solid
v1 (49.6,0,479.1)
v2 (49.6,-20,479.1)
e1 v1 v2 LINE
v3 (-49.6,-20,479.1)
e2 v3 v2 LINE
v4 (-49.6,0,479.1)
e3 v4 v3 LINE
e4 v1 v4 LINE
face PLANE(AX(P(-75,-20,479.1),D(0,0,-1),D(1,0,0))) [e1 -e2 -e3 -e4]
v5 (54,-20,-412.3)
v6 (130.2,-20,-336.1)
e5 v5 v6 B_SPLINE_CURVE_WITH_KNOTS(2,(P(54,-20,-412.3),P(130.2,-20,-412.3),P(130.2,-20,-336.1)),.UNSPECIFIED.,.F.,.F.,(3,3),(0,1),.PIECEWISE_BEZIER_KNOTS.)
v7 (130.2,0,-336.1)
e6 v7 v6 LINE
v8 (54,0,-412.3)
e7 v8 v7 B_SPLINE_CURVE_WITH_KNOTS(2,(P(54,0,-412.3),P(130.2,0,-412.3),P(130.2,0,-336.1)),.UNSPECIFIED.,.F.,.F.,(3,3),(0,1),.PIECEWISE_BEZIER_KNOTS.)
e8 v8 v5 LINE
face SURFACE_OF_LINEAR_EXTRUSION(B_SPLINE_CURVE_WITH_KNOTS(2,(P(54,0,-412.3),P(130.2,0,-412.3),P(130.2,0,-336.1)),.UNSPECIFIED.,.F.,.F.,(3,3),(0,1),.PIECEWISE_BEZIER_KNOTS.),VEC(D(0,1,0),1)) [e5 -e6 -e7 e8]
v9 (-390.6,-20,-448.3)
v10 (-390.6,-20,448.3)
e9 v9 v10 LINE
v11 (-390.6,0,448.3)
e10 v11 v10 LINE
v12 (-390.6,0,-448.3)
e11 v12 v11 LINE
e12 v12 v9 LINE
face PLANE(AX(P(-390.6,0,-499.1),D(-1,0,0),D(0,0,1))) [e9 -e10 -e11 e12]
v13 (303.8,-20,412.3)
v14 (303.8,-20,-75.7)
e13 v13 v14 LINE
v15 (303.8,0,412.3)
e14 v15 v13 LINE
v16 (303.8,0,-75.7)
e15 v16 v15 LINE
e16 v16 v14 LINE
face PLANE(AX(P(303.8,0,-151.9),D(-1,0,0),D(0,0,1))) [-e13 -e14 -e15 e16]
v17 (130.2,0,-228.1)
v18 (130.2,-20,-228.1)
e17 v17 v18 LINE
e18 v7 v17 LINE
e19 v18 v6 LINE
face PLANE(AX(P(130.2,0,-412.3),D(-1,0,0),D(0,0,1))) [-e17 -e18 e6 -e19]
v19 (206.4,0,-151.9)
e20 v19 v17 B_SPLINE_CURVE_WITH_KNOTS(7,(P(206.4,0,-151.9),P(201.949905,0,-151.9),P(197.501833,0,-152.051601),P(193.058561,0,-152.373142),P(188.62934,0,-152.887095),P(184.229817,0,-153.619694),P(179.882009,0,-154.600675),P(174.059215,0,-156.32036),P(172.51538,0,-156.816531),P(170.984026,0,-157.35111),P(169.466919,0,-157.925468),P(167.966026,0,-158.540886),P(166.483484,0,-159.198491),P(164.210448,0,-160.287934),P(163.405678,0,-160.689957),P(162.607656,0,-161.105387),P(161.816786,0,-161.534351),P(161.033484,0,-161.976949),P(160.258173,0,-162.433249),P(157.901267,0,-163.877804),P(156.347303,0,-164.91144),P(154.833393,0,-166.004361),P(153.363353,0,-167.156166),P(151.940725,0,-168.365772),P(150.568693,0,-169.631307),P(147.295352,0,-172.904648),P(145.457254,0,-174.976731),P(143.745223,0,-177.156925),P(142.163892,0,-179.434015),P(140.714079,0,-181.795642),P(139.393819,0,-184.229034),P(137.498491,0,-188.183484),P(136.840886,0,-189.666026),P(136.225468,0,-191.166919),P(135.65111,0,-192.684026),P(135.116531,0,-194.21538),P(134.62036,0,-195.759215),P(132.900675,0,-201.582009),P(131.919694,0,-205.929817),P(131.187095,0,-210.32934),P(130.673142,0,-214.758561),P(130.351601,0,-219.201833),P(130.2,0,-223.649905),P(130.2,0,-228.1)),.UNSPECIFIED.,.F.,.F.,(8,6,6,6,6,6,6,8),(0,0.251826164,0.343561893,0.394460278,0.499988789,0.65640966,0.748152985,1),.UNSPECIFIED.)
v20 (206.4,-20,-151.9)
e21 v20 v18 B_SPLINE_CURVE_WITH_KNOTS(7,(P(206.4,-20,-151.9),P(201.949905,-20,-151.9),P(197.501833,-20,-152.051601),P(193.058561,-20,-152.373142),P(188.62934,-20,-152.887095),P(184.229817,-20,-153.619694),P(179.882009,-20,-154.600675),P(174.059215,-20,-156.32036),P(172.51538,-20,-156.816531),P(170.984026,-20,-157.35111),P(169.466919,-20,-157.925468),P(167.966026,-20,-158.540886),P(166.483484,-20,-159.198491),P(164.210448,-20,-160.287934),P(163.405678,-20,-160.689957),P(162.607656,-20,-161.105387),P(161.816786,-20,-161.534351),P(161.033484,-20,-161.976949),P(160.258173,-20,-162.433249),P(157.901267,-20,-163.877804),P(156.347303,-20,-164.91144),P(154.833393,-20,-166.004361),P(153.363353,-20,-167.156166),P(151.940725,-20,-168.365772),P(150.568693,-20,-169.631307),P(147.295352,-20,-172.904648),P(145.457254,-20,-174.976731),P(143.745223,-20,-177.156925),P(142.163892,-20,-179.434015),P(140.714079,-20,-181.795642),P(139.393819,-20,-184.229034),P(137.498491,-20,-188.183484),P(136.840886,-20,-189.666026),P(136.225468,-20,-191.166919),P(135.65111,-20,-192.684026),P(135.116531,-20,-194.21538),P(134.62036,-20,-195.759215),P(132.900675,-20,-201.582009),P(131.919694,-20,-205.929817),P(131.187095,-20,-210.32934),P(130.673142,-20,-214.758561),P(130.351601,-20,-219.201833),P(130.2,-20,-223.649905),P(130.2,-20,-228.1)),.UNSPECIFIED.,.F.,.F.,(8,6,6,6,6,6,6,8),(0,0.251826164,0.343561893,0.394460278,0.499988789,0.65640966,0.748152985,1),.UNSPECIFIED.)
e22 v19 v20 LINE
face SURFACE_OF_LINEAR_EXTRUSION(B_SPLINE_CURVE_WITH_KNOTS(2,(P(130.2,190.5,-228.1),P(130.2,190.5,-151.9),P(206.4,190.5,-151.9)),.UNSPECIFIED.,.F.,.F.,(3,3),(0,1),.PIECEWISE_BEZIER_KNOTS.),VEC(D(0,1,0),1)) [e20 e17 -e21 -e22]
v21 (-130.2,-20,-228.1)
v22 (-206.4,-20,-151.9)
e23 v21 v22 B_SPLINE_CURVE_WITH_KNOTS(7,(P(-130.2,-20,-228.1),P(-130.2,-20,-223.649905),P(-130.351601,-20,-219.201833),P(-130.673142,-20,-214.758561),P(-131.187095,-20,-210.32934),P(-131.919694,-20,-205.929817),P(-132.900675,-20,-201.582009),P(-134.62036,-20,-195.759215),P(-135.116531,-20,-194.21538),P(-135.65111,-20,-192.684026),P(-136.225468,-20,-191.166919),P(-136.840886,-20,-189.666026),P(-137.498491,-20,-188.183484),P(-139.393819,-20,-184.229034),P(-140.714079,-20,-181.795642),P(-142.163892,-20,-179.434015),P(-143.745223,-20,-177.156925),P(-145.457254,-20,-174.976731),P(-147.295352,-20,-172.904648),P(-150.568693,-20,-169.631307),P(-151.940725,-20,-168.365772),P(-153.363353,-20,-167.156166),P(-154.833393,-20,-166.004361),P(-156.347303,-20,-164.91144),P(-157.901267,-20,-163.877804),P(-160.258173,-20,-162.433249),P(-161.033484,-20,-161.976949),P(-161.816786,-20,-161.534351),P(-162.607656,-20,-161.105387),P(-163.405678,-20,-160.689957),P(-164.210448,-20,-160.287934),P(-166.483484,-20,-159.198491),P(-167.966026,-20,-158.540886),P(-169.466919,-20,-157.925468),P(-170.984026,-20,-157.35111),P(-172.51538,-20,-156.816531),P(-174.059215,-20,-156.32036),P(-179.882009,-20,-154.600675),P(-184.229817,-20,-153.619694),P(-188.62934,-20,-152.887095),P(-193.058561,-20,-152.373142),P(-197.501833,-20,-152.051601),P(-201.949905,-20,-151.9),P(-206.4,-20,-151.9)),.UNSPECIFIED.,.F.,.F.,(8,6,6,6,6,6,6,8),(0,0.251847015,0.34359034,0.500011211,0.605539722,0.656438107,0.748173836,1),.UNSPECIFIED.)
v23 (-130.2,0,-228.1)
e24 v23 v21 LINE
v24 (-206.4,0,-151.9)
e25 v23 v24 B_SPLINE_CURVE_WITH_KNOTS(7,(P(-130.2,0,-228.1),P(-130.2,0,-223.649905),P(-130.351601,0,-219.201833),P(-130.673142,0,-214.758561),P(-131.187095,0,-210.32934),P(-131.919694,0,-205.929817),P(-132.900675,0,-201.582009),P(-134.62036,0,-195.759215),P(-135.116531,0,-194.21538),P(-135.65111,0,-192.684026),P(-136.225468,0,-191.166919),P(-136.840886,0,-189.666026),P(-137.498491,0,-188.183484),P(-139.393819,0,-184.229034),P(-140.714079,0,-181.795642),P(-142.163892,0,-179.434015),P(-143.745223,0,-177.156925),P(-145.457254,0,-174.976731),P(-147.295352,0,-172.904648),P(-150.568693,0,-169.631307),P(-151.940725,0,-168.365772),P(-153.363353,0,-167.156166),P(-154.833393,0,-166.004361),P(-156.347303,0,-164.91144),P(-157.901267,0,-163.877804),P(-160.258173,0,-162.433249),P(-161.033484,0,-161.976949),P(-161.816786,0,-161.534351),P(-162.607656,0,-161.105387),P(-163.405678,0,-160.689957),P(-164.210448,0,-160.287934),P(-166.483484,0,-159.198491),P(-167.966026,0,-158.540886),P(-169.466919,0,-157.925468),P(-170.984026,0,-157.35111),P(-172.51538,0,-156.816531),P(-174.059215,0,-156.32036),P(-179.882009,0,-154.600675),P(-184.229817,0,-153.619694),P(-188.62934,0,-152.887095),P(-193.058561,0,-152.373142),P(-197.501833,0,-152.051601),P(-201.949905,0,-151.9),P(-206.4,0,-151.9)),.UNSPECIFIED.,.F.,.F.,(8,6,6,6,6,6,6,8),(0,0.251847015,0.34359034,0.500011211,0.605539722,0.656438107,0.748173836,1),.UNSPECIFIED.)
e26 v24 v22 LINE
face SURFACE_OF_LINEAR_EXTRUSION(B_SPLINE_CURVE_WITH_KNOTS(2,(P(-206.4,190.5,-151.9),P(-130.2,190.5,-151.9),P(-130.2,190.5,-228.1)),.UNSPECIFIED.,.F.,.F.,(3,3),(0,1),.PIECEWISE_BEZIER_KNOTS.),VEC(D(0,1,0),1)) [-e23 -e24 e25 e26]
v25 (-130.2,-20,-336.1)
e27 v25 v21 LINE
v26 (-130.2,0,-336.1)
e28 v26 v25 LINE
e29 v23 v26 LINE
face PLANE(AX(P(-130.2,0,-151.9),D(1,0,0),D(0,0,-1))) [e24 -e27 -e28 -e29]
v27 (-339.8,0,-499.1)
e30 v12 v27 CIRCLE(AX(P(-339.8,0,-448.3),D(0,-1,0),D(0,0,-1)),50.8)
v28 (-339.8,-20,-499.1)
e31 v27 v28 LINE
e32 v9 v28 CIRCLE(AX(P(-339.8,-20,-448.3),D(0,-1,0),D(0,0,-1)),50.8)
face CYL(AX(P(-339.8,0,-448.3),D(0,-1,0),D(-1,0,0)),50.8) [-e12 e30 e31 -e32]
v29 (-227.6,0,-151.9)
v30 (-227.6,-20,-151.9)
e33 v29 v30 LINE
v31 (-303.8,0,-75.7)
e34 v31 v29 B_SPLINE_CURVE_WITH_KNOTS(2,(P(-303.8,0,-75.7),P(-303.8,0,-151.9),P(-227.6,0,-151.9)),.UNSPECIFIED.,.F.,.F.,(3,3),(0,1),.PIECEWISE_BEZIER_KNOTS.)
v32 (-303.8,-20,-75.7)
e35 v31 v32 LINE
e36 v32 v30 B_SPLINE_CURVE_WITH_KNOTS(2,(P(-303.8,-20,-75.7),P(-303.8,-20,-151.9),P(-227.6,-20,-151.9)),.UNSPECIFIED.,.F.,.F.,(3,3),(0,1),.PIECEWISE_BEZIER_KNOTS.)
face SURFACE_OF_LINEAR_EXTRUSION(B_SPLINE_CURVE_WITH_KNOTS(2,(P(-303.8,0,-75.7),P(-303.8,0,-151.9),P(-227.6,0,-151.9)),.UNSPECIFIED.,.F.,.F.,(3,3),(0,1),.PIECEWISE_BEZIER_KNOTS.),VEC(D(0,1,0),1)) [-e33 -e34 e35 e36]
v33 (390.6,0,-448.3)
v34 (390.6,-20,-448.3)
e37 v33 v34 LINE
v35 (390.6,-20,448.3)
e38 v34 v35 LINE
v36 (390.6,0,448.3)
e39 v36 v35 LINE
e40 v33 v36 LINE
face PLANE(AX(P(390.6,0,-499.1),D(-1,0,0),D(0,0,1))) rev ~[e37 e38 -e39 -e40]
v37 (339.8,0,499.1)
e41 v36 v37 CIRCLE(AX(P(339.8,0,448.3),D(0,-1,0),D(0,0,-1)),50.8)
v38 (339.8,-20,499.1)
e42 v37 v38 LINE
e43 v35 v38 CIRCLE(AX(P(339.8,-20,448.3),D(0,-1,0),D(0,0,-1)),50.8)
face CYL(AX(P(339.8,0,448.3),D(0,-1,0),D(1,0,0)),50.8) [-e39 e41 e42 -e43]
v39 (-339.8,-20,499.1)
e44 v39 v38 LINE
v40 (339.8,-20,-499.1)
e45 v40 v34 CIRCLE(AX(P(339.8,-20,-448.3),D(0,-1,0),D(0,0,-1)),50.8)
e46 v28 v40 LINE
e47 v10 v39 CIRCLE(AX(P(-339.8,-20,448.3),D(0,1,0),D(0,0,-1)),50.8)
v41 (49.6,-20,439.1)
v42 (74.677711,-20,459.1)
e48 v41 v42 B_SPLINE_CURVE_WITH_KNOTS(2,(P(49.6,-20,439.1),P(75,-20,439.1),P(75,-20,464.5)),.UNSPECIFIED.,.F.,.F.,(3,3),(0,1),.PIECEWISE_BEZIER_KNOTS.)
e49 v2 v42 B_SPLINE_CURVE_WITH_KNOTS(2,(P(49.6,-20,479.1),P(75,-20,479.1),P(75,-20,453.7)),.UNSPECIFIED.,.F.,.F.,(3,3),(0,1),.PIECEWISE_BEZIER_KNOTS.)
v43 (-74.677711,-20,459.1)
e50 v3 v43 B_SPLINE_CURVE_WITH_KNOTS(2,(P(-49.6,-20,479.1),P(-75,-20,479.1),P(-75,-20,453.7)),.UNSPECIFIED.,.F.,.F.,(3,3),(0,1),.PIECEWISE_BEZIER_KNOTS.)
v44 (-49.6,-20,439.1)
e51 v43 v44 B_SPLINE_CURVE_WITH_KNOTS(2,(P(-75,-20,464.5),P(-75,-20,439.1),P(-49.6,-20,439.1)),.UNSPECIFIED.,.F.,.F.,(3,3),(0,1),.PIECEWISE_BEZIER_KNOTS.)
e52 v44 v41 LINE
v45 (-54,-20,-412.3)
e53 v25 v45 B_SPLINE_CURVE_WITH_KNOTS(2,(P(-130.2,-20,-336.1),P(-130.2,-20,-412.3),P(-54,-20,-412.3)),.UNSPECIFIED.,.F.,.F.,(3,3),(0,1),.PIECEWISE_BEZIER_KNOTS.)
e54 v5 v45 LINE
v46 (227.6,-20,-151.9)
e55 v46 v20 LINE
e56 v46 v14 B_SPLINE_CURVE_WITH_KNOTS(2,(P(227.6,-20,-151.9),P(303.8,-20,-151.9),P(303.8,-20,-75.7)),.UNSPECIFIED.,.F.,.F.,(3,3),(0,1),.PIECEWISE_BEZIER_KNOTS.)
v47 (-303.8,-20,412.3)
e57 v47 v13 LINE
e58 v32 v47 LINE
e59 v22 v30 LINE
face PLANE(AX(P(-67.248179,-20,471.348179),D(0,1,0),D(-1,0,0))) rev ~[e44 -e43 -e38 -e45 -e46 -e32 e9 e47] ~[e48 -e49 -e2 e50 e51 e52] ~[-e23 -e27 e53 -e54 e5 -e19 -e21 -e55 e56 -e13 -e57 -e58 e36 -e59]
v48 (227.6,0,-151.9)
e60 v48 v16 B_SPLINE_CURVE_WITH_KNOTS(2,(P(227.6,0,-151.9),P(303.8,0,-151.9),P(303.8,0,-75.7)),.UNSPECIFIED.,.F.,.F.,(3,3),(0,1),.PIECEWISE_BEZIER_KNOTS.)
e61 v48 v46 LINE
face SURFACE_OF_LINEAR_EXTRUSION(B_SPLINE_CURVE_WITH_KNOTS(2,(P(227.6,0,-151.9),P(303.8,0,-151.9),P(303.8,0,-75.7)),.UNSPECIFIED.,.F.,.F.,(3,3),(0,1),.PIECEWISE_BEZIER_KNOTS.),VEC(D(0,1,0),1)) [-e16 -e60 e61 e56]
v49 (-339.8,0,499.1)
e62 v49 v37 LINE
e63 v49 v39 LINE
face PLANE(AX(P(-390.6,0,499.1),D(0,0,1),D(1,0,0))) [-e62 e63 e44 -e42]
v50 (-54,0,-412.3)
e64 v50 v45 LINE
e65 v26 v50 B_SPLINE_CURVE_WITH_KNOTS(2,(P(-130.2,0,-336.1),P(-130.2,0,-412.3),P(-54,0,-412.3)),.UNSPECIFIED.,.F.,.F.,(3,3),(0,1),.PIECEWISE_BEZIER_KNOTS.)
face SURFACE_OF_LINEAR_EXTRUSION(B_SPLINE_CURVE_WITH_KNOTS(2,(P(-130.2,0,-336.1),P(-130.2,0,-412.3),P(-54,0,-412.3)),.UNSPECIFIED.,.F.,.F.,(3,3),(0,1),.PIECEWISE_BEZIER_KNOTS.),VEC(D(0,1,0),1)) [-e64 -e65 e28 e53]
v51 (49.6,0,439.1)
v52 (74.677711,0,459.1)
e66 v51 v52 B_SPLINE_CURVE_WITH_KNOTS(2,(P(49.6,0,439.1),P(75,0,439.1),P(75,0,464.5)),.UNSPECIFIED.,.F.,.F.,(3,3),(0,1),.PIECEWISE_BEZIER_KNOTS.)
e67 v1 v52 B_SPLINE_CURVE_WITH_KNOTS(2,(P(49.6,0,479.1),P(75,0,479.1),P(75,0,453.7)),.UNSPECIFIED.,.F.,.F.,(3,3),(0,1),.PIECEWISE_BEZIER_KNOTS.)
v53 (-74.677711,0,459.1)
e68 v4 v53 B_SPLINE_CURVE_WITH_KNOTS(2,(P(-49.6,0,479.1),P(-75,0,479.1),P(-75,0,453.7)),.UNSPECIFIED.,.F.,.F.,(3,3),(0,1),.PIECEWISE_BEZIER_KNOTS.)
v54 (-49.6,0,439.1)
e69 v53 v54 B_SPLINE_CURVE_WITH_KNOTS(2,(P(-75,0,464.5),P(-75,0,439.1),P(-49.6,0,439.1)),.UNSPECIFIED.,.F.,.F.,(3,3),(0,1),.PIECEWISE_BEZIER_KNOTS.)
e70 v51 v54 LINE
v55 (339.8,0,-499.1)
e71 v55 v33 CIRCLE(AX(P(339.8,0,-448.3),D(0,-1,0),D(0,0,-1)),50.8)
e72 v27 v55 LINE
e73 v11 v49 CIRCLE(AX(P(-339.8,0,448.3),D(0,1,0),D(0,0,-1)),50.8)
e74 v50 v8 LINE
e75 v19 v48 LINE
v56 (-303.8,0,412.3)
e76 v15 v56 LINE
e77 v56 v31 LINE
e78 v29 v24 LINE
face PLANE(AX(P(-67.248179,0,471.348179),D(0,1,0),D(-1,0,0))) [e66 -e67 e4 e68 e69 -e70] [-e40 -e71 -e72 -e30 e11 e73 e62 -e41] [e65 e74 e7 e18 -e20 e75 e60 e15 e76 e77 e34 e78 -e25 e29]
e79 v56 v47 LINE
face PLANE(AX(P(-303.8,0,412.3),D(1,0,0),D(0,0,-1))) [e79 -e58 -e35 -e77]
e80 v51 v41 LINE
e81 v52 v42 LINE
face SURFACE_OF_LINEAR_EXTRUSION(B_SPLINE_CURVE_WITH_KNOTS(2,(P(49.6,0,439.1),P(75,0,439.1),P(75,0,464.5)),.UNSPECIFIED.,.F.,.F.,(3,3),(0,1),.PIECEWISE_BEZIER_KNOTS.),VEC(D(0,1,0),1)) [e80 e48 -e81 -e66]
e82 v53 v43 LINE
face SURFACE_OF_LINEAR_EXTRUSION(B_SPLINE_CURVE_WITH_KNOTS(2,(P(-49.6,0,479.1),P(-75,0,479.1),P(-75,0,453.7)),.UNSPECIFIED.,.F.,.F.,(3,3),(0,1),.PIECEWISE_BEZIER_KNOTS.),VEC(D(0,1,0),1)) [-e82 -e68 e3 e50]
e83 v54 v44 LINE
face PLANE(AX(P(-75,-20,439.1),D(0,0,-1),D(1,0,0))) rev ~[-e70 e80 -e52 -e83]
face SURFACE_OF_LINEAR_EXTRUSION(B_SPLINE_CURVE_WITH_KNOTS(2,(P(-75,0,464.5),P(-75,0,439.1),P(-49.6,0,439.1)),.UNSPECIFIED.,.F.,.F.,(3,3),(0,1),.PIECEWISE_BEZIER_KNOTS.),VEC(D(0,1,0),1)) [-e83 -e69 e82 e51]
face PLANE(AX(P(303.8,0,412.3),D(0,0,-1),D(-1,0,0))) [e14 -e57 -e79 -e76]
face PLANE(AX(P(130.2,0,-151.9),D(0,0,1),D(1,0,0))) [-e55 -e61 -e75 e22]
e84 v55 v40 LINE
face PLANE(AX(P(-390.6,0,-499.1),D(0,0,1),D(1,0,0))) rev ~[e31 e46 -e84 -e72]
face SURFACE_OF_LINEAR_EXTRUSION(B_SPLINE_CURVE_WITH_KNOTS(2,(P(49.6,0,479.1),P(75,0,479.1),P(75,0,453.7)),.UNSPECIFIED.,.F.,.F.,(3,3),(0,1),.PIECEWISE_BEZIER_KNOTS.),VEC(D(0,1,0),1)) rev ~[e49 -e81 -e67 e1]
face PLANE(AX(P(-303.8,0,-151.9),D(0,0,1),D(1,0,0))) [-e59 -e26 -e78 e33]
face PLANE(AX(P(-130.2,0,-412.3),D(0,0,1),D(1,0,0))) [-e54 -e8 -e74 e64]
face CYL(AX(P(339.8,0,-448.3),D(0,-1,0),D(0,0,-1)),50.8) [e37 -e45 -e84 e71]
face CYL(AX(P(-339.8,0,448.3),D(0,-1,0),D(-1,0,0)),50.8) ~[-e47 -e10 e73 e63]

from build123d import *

# Parameters (mm, degrees)
F0_W         = 781.2
F0_H         = 998.2
F1_DEPTH     = 20
F2_R         = 50.8
F4_DEPTH     = 25.4
F5_T1_DEPTH  = 20
F5_T3_DEPTH  = 401
F6_W         = 260.4
F6_H         = 46.8
F7_DEPTH     = 25.4
F8_W         = 150
F8_H         = 40
F9_DEPTH     = 20.0010001
F10_T1_DEPTH = 20


# Not quite as in the source:
# - a fillet or chamfer that OpenCascade refuses, or shapes differently, is made with other operations: its cross-section is extruded or revolved along the edge and cut away or added


with BuildPart() as f1:
    # F0 (on Front) → F1 (new body)
    with BuildSketch(Plane.XZ):
        Rectangle(F0_W, F0_H)
    extrude(amount=F1_DEPTH)

    # F2
    f2_edges = [f1.edges().sort_by_distance(p)[0] for p in [
        (-390.6, -10, 499.1),
        (390.6, -10, 499.1),
        (390.6, -10, -499.1),
        (-390.6, -10, -499.1),
    ]]
    fillet(f2_edges, radius=F2_R)

    # F3 (on Front) → F4 (cut)
    with BuildSketch(Plane.XZ):
        Polygon((303.8, 412.3), (-303.8, 412.3), (-303.8, -151.9), (-130.2, -151.9), (-130.2, -412.3), (130.2, -412.3), (130.2, -151.9), (303.8, -151.9), align=None)
    extrude(amount=F4_DEPTH, mode=Mode.SUBTRACT)

    # F5: fillet of radius 76.2 on 6 edges, made by hand

    # F5_s2 → F5_t1 (join)
    with BuildSketch(Plane.XZ):
        with BuildLine():
            add(Edge.make_bspline(
                [(-303.8, -75.7), (-303.8, -151.9), (-227.6, -151.9)],
                knots=[0, 0, 0, 1, 1, 1], degree=2, weights=[1, 1, 1]))
            Line((-227.6, -151.9), (-303.8, -151.9))
            Line((-303.8, -151.9), (-303.8, -75.7))
        make_face()
        with BuildLine():
            add(Edge.make_bspline(
                [(-130.2, -336.1), (-130.2, -412.3), (-54, -412.3)],
                knots=[0, 0, 0, 1, 1, 1], degree=2, weights=[1, 1, 1]))
            Line((-54, -412.3), (-130.2, -412.3))
            Line((-130.2, -412.3), (-130.2, -336.1))
        make_face()
        with BuildLine():
            add(Edge.make_bspline(
                [(227.6, -151.9), (303.8, -151.9), (303.8, -75.7)],
                knots=[0, 0, 0, 1, 1, 1], degree=2, weights=[1, 1, 1]))
            Line((303.8, -75.7), (303.8, -151.9))
            Line((303.8, -151.9), (227.6, -151.9))
        make_face()
        with BuildLine():
            add(Edge.make_bspline(
                [(54, -412.3), (130.2, -412.3), (130.2, -336.1)],
                knots=[0, 0, 0, 1, 1, 1], degree=2, weights=[1, 1, 1]))
            Line((130.2, -336.1), (130.2, -412.3))
            Line((130.2, -412.3), (54, -412.3))
        make_face()
    extrude(amount=F5_T1_DEPTH)

    # F5_s4 → F5_t3 (cut)
    with BuildSketch(Plane.XZ.offset(-190.5)):
        with BuildLine():
            add(Edge.make_bspline(
                [(-206.4, -151.9), (-130.2, -151.9), (-130.2, -228.1)],
                knots=[0, 0, 0, 1, 1, 1], degree=2, weights=[1, 1, 1]))
            Line((-130.2, -228.1), (-130.2, -151.9))
            Line((-130.2, -151.9), (-206.4, -151.9))
        make_face()
        with BuildLine():
            add(Edge.make_bspline(
                [(130.2, -228.1), (130.2, -151.9), (206.4, -151.9)],
                knots=[0, 0, 0, 1, 1, 1], degree=2, weights=[1, 1, 1]))
            Line((206.4, -151.9), (130.2, -151.9))
            Line((130.2, -151.9), (130.2, -228.1))
        make_face()
    extrude(amount=F5_T3_DEPTH, mode=Mode.SUBTRACT)

    # F6 (on Front) → F7 (cut)
    with BuildSketch(Plane.XZ):
        with Locations((0, 455.7)):
            Rectangle(F6_W, F6_H)
    extrude(amount=-F7_DEPTH, mode=Mode.SUBTRACT)

    # F8 (on face) → F9 (cut, through all)
    with BuildSketch(Plane.XZ.offset(20)):
        with Locations((0, 459.1)):
            Rectangle(F8_W, F8_H)
    extrude(amount=-F9_DEPTH, mode=Mode.SUBTRACT)

    # F10: fillet of radius 25.4 on 4 edges, made by hand

    # F10_s2 → F10_t1 (join)
    with BuildSketch(Plane.XZ):
        with BuildLine():
            add(Edge.make_bspline(
                [(-49.6, 479.1), (-75, 479.1), (-75, 453.7)],
                knots=[0, 0, 0, 1, 1, 1], degree=2, weights=[1, 1, 1]))
            Line((-75, 453.7), (-75, 479.1))
            Line((-75, 479.1), (-49.6, 479.1))
        make_face()
        with BuildLine():
            add(Edge.make_bspline(
                [(-75, 464.5), (-75, 439.1), (-49.6, 439.1)],
                knots=[0, 0, 0, 1, 1, 1], degree=2, weights=[1, 1, 1]))
            Line((-49.6, 439.1), (-75, 439.1))
            Line((-75, 439.1), (-75, 464.5))
        make_face()
        with BuildLine():
            add(Edge.make_bspline(
                [(49.6, 479.1), (75, 479.1), (75, 453.7)],
                knots=[0, 0, 0, 1, 1, 1], degree=2, weights=[1, 1, 1]))
            Line((75, 453.7), (75, 479.1))
            Line((75, 479.1), (49.6, 479.1))
        make_face()
        with BuildLine():
            add(Edge.make_bspline(
                [(49.6, 439.1), (75, 439.1), (75, 464.5)],
                knots=[0, 0, 0, 1, 1, 1], degree=2, weights=[1, 1, 1]))
            Line((75, 464.5), (75, 439.1))
            Line((75, 439.1), (49.6, 439.1))
        make_face()
    extrude(amount=F10_T1_DEPTH)


solid = f1.part
